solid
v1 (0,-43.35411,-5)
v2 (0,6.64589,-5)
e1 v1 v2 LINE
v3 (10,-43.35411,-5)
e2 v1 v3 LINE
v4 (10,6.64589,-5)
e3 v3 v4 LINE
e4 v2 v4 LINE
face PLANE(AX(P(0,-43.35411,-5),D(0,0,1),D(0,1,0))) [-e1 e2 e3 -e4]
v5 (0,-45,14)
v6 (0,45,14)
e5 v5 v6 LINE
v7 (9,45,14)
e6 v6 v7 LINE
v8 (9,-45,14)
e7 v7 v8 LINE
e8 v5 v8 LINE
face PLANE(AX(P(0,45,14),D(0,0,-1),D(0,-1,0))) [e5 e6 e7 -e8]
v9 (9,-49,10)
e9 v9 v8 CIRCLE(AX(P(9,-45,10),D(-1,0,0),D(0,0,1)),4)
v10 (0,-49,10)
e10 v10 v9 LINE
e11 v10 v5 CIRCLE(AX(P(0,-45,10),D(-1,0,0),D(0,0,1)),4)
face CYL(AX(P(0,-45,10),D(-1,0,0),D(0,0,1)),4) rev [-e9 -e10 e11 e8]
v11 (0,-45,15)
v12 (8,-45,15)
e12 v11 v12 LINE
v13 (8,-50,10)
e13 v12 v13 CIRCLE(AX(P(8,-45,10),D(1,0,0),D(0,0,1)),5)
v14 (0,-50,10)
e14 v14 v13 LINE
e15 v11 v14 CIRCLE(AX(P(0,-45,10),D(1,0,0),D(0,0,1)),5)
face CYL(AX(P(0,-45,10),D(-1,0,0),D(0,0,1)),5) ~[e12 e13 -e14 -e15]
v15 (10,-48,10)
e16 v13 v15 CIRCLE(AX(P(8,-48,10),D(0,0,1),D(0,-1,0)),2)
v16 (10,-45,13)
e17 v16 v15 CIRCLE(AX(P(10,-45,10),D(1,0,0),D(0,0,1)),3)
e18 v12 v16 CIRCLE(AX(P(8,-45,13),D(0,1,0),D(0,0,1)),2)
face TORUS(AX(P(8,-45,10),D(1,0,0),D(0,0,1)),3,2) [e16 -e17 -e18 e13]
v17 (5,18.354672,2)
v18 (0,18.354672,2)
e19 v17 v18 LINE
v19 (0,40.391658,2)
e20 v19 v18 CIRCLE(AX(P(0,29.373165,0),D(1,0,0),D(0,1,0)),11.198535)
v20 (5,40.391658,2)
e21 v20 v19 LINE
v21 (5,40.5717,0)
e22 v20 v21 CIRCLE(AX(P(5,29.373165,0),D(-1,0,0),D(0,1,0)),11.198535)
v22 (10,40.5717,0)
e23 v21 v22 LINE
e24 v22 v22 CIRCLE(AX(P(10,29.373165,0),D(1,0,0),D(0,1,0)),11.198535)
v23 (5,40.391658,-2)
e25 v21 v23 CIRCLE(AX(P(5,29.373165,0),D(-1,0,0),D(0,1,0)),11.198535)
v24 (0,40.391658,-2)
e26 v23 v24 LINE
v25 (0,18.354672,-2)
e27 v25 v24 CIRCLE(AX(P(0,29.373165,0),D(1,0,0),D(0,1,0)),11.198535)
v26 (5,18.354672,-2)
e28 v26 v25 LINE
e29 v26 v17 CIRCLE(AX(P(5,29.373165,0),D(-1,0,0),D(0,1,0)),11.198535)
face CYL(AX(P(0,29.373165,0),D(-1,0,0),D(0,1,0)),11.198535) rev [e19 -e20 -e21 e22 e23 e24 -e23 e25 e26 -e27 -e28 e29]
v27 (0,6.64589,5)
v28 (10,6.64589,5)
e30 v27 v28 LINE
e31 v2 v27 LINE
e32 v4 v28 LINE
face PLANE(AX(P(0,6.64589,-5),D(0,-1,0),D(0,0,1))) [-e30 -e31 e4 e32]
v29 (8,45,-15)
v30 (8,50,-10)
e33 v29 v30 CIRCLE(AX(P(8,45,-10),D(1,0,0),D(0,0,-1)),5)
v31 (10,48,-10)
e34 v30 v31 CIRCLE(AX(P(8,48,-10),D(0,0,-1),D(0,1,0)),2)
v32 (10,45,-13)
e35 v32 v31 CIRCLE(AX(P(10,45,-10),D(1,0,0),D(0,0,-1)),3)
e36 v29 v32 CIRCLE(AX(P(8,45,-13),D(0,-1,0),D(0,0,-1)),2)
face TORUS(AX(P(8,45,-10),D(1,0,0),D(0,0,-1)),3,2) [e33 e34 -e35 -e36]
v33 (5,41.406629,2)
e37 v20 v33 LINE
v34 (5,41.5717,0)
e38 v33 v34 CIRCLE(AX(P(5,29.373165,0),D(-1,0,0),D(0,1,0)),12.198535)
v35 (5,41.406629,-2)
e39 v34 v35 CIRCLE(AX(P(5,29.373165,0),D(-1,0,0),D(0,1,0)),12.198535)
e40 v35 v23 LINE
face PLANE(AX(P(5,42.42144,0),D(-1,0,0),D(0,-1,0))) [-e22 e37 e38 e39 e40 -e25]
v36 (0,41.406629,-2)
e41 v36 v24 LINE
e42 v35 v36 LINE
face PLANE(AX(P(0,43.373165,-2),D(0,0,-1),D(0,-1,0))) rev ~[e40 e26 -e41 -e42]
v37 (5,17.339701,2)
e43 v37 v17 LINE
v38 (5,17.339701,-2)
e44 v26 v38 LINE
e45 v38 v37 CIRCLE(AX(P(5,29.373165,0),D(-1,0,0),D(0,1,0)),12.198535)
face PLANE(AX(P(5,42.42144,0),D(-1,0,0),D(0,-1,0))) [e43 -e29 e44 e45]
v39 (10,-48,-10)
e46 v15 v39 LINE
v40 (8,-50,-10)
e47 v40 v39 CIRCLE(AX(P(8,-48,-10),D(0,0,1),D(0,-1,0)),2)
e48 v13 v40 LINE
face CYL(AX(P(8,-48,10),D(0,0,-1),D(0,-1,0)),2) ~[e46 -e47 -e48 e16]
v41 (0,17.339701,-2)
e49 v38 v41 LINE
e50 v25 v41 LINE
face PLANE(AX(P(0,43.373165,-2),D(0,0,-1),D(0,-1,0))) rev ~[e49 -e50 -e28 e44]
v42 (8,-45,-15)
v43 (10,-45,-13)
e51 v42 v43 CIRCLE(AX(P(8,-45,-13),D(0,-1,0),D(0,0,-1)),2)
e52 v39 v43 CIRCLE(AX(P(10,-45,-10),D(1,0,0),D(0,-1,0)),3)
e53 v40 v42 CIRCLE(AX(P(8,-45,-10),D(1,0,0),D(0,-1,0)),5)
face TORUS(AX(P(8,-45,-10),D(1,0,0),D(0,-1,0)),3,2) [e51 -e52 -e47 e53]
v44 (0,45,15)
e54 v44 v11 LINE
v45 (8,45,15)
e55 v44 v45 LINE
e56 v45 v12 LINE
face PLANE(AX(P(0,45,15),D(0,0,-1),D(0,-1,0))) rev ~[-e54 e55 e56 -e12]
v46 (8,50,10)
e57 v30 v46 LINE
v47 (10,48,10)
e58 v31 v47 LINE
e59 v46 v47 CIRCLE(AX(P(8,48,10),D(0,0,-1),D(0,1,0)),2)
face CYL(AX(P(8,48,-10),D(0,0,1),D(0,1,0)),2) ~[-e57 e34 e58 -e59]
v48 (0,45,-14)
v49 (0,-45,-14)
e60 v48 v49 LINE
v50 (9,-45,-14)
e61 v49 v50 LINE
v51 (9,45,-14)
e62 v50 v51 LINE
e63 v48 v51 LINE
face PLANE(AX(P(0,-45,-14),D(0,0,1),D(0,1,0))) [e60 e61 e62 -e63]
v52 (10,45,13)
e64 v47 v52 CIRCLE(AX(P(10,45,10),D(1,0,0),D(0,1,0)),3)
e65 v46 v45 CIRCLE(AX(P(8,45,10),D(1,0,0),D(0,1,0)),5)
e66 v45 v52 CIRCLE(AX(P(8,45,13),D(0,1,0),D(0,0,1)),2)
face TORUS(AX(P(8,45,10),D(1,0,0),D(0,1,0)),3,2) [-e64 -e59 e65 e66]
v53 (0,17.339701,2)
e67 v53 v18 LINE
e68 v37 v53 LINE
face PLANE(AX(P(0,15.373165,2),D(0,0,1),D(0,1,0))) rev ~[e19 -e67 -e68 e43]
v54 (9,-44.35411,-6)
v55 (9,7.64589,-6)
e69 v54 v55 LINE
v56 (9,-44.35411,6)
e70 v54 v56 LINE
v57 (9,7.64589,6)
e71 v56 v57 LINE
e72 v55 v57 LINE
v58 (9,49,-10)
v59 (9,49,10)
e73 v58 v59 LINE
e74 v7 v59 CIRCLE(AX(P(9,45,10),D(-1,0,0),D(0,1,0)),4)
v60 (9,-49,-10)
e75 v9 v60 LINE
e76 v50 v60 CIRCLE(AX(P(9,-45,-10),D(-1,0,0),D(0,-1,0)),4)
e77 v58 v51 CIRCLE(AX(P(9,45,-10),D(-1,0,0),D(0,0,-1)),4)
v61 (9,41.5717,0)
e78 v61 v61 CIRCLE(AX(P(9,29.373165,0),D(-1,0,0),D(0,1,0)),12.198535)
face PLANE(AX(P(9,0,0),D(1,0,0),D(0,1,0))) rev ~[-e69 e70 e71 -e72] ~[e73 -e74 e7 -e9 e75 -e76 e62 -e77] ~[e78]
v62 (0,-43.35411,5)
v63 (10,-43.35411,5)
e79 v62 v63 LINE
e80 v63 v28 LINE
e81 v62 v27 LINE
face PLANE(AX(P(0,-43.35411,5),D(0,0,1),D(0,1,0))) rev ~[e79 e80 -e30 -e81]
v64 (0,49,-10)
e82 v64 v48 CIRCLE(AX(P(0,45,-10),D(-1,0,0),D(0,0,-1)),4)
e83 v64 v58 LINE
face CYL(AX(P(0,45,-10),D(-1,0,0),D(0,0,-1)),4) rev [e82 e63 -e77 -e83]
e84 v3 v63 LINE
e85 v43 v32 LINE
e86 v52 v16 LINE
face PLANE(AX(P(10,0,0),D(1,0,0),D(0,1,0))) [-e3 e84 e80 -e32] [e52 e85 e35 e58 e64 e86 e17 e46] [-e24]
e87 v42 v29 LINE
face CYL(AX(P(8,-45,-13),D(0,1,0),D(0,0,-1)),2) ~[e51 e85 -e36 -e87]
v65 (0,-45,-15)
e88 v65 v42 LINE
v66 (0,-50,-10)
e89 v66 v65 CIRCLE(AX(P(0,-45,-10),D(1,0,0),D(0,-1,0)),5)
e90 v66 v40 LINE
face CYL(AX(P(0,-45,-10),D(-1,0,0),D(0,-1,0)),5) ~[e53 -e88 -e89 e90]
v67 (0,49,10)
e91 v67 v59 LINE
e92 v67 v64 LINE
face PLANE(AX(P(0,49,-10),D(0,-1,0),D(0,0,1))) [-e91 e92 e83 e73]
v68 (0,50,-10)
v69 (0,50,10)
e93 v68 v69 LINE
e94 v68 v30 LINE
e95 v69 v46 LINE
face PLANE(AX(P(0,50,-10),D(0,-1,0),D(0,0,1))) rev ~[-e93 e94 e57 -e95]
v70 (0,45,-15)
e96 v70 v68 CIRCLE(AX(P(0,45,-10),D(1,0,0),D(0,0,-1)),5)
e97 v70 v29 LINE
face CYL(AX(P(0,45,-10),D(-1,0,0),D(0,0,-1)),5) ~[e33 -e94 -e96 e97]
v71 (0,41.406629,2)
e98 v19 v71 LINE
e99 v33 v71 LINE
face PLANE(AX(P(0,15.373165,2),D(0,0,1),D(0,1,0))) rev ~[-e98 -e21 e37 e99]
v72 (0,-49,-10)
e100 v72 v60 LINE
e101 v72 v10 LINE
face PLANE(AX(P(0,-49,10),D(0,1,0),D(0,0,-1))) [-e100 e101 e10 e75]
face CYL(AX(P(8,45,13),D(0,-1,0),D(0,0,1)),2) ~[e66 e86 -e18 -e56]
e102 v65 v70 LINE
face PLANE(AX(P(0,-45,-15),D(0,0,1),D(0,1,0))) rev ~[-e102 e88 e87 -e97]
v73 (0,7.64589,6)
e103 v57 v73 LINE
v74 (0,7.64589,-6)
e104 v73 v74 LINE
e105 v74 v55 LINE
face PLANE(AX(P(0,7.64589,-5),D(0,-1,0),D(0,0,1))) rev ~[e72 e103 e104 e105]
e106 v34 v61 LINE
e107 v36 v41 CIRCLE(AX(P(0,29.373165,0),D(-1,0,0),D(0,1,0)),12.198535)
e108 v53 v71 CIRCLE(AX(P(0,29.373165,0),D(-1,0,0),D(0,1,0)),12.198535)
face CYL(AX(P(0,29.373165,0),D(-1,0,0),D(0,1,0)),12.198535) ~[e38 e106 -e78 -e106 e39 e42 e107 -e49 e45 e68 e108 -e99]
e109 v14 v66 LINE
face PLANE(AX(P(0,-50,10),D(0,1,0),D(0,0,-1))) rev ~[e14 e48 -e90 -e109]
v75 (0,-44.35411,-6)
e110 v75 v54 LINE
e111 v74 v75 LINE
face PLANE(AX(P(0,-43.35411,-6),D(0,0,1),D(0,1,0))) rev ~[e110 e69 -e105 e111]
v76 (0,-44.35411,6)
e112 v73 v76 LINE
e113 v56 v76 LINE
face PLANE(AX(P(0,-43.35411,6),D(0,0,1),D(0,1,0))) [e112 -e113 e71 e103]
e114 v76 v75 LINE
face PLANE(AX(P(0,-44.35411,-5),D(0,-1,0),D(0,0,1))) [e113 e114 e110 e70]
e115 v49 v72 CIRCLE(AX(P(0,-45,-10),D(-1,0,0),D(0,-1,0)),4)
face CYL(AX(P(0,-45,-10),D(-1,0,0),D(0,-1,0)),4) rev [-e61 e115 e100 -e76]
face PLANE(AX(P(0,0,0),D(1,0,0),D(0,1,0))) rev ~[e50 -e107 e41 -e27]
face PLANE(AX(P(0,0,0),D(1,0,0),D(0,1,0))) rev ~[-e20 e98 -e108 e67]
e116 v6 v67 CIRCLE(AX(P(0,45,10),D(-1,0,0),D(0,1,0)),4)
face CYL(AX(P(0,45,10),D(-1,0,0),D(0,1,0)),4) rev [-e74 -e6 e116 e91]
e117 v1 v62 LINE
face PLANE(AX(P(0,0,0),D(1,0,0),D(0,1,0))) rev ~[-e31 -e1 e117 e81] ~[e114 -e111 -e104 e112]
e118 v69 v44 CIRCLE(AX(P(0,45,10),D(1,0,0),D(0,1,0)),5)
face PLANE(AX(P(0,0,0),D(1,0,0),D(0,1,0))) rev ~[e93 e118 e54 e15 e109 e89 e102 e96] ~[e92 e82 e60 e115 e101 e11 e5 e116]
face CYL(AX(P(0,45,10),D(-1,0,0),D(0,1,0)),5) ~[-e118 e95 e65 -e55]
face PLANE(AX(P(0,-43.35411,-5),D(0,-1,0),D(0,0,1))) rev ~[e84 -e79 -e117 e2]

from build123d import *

# Parameters (mm, degrees)
F0_W     = 50
F0_H     = 10
F0_R     = 11.1985350655
F1_DEPTH = 10
F2_T     = -1
F3_R     = 2
F5_DEPTH = 5


with BuildPart() as f1:
    # F0 (on Right) → F1 (new body)
    with BuildSketch(Plane.YZ):
        with BuildLine():
            ThreePointArc((-50, -10), (-48.5355339059, -13.5355339059), (-45, -15))
            Line((-45, -15), (45, -15))
            ThreePointArc((45, -15), (48.5355339059, -13.5355339059), (50, -10))
            Line((50, -10), (50, 10))
            ThreePointArc((50, 10), (48.5355339059, 13.5355339059), (45, 15))
            Line((45, 15), (-45, 15))
            ThreePointArc((-45, 15), (-48.5355339059, 13.5355339059), (-50, 10))
            Line((-50, 10), (-50, -10))
        make_face()
        with Locations((-18.3541104198, 0)):
            Rectangle(F0_W, F0_H, mode=Mode.SUBTRACT)
        with Locations((29.37316522, 0)):
            Circle(F0_R, mode=Mode.SUBTRACT)
    extrude(amount=F1_DEPTH)

    # F2
    f2_openings = [f1.faces().sort_by_distance(p)[0] for p in [
        (0, -47.797293, 12.797293),
    ]]
    offset(amount=F2_T, openings=f2_openings, kind=Kind.INTERSECTION)

    # F3
    f3_edges = [f1.edges().sort_by_distance(p)[0] for p in [
        (10, 0, -15),
        (10, -48.535534, 13.535534),
        (10, -50, 0),
        (10, -48.535534, -13.535534),
        (10, 48.535534, -13.535534),
        (10, 50, 0),
        (10, 48.535534, 13.535534),
        (10, 0, 15),
    ]]
    fillet(f3_edges, radius=F3_R)

    # F4 (on face) → F5 (cut)
    with BuildSketch(Plane(origin=(0, 0, 0), x_dir=(0, -1, 0), z_dir=(-1, 0, 0))):
        with BuildLine():
            Line((-41.4066292992, 2), (-43.37316522, 2))
            Line((-43.37316522, 2), (-43.37316522, -2))
            Line((-43.37316522, -2), (-41.4066292992, -2))
            ThreePointArc((-41.4066292992, -2), (-41.5717002855, 0), (-41.4066292992, 2))
        make_face()
        with BuildLine():
            Line((-40.3916582029, 2), (-41.4066292992, 2))
            ThreePointArc((-41.4066292992, 2), (-41.5717002855, 0), (-41.4066292992, -2))
            Line((-41.4066292992, -2), (-40.3916582029, -2))
            ThreePointArc((-40.3916582029, -2), (-40.5717002855, 0), (-40.3916582029, 2))
        make_face()
        with BuildLine():
            Line((-18.3546722372, 2), (-40.3916582029, 2))
            ThreePointArc((-40.3916582029, 2), (-40.5717002855, 0), (-40.3916582029, -2))
            Line((-40.3916582029, -2), (-18.3546722372, -2))
            ThreePointArc((-18.3546722372, -2), (-18.2197314965, -1.0040437181), (-18.1746301545, 0))
            ThreePointArc((-18.1746301545, 0), (-18.2197314965, 1.0040437181), (-18.3546722372, 2))
        make_face()
        with BuildLine():
            ThreePointArc((-17.1746301545, 0), (-17.2159679428, 1.0034002729), (-17.3397011409, 2))
            Line((-17.3397011409, 2), (-18.3546722372, 2))
            ThreePointArc((-18.3546722372, 2), (-18.2197314965, 1.0040437181), (-18.1746301545, 0))
            ThreePointArc((-18.1746301545, 0), (-18.2197314965, -1.0040437181), (-18.3546722372, -2))
            Line((-18.3546722372, -2), (-17.3397011409, -2))
            ThreePointArc((-17.3397011409, -2), (-17.2159679428, -1.0034002729), (-17.1746301545, 0))
        make_face()
        with BuildLine():
            Line((-15.37316522, 2), (-17.3397011409, 2))
            ThreePointArc((-17.3397011409, 2), (-17.2159679428, 1.0034002729), (-17.1746301545, 0))
            ThreePointArc((-17.1746301545, 0), (-17.2159679428, -1.0034002729), (-17.3397011409, -2))
            Line((-17.3397011409, -2), (-15.37316522, -2))
            Line((-15.37316522, -2), (-15.37316522, 2))
        make_face()
    extrude(amount=-F5_DEPTH, mode=Mode.SUBTRACT)


solid = f1.part
